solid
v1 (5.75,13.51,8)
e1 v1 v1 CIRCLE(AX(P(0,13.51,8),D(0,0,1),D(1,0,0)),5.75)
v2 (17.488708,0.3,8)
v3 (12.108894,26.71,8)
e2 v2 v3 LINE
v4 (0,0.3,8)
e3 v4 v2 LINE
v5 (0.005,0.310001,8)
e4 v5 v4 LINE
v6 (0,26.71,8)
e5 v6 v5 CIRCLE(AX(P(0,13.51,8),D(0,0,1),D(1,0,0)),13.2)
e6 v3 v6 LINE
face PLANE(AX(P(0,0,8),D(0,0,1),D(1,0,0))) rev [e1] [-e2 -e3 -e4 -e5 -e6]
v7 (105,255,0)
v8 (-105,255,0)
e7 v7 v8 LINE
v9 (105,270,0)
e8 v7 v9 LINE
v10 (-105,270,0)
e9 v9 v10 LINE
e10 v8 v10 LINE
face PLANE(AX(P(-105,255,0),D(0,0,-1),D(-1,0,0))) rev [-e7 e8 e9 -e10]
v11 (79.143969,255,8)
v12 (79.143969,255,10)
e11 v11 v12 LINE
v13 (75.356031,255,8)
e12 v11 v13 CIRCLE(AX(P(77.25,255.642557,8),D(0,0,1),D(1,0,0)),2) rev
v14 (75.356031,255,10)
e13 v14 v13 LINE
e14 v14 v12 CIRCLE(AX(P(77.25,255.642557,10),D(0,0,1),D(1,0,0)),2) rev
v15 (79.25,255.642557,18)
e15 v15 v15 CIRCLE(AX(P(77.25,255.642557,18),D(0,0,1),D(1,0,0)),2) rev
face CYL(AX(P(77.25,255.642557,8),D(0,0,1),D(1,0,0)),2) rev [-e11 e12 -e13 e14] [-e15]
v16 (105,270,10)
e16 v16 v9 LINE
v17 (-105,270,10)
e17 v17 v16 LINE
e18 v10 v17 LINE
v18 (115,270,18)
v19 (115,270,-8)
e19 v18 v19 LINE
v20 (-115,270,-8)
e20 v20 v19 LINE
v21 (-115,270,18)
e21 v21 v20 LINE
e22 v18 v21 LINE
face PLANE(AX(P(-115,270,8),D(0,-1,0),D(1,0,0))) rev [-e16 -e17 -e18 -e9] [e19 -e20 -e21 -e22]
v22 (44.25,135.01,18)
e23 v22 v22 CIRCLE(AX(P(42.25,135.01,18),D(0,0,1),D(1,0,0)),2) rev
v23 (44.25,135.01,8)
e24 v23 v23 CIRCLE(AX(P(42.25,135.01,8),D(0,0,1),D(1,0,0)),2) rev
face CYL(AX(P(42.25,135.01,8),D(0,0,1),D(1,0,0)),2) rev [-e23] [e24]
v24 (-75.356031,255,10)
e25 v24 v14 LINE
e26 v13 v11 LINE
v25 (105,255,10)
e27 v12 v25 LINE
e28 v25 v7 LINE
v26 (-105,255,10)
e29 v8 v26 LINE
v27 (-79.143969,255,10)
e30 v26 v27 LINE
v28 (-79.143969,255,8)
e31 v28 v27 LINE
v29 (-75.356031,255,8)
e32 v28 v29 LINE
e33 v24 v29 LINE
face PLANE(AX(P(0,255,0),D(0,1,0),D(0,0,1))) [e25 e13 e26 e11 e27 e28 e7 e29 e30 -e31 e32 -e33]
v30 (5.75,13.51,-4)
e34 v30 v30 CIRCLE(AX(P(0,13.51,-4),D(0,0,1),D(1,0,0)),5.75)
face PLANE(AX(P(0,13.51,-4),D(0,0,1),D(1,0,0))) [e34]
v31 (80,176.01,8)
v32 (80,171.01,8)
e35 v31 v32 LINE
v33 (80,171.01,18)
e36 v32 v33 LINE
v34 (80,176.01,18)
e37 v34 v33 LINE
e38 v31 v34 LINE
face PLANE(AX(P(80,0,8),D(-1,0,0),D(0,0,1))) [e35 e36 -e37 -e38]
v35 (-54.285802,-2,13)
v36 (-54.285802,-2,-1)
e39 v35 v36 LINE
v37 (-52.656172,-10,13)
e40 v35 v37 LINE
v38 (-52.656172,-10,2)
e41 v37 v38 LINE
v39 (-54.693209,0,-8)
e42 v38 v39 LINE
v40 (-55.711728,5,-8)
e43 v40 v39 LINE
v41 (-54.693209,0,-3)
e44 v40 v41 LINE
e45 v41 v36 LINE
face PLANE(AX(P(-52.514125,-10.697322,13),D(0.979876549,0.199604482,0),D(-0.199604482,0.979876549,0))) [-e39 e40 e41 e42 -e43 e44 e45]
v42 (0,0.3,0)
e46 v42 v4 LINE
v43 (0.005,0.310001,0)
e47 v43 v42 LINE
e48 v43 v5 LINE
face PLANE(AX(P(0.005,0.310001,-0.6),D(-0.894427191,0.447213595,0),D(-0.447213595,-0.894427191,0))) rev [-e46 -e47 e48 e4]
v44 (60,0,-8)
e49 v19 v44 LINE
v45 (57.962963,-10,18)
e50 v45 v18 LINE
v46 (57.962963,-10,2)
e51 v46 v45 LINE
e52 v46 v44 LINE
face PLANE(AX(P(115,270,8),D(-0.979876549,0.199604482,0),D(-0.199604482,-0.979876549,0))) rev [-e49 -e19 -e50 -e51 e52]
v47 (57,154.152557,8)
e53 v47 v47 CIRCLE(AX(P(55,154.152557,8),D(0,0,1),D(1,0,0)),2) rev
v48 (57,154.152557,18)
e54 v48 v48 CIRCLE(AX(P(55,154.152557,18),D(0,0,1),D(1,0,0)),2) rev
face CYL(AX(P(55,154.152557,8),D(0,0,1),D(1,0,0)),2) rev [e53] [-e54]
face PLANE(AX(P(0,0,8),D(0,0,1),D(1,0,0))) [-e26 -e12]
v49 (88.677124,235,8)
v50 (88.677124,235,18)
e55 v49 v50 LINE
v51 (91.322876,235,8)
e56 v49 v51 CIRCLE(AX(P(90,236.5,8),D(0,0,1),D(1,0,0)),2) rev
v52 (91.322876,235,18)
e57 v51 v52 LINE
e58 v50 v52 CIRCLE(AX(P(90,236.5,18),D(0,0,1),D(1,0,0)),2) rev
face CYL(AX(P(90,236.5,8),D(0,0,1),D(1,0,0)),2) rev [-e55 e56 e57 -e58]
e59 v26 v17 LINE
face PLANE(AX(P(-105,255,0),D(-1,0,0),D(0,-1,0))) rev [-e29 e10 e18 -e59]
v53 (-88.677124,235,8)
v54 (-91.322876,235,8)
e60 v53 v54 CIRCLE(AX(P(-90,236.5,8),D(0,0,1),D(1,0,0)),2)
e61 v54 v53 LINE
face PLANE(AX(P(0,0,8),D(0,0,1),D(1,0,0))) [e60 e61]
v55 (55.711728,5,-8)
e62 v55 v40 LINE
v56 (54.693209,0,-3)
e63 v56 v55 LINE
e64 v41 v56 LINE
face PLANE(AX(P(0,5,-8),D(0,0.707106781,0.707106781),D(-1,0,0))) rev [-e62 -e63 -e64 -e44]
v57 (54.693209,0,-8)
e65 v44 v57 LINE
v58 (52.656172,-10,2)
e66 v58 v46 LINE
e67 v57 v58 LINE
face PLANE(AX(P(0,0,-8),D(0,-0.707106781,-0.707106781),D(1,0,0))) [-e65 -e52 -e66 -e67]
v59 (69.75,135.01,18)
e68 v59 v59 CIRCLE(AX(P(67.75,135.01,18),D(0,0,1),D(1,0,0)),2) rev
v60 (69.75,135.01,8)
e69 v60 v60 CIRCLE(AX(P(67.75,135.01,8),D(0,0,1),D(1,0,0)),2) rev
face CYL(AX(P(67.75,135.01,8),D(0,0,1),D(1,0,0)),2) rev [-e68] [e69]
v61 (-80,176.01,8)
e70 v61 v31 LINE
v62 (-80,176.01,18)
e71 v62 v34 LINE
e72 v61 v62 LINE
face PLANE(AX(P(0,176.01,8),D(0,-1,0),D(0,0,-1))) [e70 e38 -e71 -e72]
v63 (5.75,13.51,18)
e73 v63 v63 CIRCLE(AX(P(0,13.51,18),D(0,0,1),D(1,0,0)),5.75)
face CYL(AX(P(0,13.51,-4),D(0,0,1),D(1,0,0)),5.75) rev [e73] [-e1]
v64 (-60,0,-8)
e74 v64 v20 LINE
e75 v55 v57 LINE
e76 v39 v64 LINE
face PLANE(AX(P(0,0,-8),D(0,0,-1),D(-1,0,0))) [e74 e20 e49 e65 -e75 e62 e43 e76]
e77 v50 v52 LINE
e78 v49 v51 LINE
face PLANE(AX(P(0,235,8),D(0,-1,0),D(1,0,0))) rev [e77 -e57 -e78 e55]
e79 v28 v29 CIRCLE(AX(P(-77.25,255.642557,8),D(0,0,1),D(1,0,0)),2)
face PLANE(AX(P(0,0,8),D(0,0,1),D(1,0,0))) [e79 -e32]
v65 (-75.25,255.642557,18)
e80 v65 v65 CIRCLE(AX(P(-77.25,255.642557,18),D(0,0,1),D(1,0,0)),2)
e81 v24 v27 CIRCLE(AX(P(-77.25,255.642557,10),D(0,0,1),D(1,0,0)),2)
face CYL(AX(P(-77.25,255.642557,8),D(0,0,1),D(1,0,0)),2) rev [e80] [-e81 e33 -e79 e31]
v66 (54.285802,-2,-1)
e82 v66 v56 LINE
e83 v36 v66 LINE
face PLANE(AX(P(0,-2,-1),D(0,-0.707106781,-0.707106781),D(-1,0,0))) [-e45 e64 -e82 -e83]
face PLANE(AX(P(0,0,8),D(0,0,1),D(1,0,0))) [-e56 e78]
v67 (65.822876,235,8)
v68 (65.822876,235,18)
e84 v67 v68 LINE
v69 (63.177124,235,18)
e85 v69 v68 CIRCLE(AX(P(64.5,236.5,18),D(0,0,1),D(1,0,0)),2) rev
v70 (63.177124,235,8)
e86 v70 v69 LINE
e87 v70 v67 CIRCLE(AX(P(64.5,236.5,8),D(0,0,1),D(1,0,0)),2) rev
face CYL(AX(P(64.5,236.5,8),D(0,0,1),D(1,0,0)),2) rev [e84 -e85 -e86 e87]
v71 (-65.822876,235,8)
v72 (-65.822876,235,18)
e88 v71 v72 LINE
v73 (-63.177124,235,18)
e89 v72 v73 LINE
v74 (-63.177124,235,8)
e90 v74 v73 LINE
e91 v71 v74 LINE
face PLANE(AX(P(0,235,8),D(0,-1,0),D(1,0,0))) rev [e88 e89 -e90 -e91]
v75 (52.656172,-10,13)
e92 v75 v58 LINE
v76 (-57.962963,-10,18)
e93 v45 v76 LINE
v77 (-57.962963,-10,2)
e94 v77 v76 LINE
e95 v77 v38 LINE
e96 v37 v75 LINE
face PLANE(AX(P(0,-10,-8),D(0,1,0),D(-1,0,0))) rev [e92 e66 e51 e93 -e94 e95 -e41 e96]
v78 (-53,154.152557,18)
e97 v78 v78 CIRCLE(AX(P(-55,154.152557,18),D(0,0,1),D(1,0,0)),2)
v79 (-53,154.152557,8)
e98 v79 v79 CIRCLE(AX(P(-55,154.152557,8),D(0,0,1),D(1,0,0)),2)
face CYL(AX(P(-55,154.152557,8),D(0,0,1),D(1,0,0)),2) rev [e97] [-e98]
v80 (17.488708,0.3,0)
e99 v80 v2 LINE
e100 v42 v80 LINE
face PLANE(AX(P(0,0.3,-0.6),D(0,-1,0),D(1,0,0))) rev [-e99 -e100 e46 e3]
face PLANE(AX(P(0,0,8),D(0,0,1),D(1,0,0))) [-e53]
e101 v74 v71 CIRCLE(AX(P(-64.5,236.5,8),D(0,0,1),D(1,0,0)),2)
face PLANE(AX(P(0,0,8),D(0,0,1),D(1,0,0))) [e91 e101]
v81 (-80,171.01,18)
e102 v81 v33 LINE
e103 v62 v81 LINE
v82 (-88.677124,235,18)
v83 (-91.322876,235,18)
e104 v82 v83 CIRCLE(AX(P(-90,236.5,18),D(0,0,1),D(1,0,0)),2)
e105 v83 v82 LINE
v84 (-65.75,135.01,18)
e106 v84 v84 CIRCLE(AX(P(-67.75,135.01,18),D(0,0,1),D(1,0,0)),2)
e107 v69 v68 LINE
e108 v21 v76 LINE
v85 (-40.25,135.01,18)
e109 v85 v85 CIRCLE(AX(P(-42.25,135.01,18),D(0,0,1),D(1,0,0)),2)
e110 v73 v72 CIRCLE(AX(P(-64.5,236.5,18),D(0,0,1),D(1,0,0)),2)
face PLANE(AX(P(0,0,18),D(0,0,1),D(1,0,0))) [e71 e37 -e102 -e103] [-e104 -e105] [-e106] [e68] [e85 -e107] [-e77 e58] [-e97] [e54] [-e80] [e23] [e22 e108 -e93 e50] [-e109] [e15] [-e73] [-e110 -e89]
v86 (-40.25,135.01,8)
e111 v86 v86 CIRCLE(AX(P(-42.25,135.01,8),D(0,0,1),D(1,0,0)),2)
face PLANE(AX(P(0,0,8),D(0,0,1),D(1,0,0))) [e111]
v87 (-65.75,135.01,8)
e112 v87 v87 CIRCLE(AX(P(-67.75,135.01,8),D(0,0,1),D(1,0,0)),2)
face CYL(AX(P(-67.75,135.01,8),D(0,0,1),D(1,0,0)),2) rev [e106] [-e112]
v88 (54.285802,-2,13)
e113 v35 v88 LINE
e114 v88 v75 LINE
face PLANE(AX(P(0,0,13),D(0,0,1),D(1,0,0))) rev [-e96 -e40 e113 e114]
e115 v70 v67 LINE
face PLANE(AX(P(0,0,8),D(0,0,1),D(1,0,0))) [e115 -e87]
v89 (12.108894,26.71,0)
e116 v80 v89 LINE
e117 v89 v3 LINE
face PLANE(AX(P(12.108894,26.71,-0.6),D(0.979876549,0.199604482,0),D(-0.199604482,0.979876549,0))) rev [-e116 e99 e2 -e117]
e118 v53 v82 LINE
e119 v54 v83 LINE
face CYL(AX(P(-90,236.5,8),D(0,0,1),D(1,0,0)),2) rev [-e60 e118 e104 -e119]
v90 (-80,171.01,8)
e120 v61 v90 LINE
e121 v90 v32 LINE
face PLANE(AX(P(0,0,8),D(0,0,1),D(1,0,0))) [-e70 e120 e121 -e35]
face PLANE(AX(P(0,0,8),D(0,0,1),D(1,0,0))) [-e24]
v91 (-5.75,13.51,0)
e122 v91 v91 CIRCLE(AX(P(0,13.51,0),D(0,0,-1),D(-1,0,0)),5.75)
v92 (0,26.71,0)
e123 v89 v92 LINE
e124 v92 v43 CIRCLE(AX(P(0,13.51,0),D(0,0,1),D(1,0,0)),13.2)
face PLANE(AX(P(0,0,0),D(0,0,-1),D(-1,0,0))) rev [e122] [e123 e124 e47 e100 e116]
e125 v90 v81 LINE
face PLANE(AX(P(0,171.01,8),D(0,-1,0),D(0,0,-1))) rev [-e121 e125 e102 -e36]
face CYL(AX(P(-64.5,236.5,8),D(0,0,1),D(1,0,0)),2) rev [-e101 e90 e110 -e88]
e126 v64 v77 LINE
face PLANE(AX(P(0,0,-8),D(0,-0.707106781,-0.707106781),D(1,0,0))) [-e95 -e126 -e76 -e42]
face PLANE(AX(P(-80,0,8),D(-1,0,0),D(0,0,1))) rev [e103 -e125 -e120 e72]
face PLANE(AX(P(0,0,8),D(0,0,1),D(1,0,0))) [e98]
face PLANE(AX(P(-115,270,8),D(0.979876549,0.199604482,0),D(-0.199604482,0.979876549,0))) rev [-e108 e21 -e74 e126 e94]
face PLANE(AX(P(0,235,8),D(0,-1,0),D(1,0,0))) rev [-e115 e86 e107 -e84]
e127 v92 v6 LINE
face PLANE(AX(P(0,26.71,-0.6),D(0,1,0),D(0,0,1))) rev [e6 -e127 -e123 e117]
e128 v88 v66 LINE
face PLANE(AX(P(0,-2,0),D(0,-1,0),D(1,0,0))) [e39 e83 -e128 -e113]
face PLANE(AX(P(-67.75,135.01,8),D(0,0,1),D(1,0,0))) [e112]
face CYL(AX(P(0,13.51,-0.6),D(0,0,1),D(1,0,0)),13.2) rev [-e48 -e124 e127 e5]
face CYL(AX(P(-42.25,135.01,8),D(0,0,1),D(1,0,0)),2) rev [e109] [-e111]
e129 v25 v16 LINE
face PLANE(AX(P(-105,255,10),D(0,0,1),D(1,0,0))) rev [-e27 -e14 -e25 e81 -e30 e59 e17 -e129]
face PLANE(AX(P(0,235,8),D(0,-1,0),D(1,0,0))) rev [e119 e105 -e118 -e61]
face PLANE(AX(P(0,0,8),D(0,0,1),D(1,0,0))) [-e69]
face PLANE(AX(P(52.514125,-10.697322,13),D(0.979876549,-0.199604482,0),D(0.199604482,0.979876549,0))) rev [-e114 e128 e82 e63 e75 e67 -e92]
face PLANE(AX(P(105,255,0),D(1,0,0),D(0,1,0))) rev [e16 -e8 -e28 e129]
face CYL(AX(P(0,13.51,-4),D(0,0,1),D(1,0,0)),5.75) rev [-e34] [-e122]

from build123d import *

# Parameters (mm, degrees)
EXTRUDE_1_DEPTH     = 8
CUT_EXTRUDE_1_DEPTH = 8.6
EXTRUDE_2_DEPTH     = 8
EXTRUDE_3_DEPTH     = 10
SKETCH_7_R          = 5.75
CUT_EXTRUDE_2_DEPTH = 22
EXTRUDE_5_DEPTH     = 26
CUT_EXTRUDE_4_DEPTH = 21
CHAMFER_6_SIZE      = 5
CHAMFER_8_SIZE      = 10
SKETCH_13_W         = 210
SKETCH_13_H         = 10
CUT_EXTRUDE_5_DEPTH = 15
SKETCH_14_W         = 160
SKETCH_14_H         = 5
CUT_EXTRUDE_6_DEPTH = 10
SKETCH_16_R         = 2
CUT_EXTRUDE_7_DEPTH = 10
SKETCH_18_W         = 109.386418102
SKETCH_18_H         = 16
EXTRUDE_7_DEPTH     = 2
CHAMFER_10_SIZE     = 2


with BuildPart() as part:
    # 草图1 → 凸台-拉伸1 (new body)
    with BuildSketch(Plane.XY):
        Polygon((-60, 0), (60, 0), (115, 270), (-115, 270), align=None)
    extrude(amount=EXTRUDE_1_DEPTH)

    # 草图2 → 切除-拉伸1 (cut)
    with BuildSketch(Plane.XY.offset(8)):
        with BuildLine():
            Line((0.005000474, 0.310000947), (0, 0.3))
            Line((0, 0.3), (17.48870838, 0.3))
            Line((17.48870838, 0.3), (12.108893566, 26.71))
            Line((12.108893566, 26.71), (0, 26.71))
            ThreePointArc((0, 26.71), (-13.199999763, 13.507499763), (0.005000474, 0.310000947))
        make_face()
    extrude(amount=-CUT_EXTRUDE_1_DEPTH, mode=Mode.SUBTRACT)

    # 草图5 → 凸台-拉伸2 (add)
    with BuildSketch(Plane(origin=(0, 0, 0), x_dir=(-1, 0, 0), z_dir=(0, 0, -1))):
        Polygon((60, 0), (115, 270), (-115, 270), (-60, 0), align=None)
    extrude(amount=EXTRUDE_2_DEPTH)

    # 草图6 → 凸台-拉伸3 (add)
    with BuildSketch(Plane.XY.offset(8)):
        Polygon((-115, 270), (-60, 0), (60, 0), (115, 270), align=None)
    extrude(amount=EXTRUDE_3_DEPTH)

    # 草图7 → 切除-拉伸2 (cut)
    with BuildSketch(Plane.XY.offset(18)):
        with Locations((0, 13.51)):
            Circle(SKETCH_7_R)
    extrude(amount=-CUT_EXTRUDE_2_DEPTH, mode=Mode.SUBTRACT)

    # 草图9 → 凸台-拉伸5 (add)
    with BuildSketch(Plane.XY.offset(18)):
        Polygon((-57.962962963, -10), (-60, 0), (60, 0), (57.962962963, -10), align=None)
    extrude(amount=-EXTRUDE_5_DEPTH)

    # 草图12 → 切除-拉伸4 (cut)
    with BuildSketch(Plane.XY.offset(-8)):
        Polygon((54.693209051, 0), (-54.693209051, 0), (-52.656172014, -10), (52.656172014, -10), align=None)
    extrude(amount=CUT_EXTRUDE_4_DEPTH, mode=Mode.SUBTRACT)

    # 倒角6
    chamfer_6_edges = [part.edges().sort_by_distance(p)[0] for p in [
        (0, 0, -8),
    ]]
    chamfer(chamfer_6_edges, length=CHAMFER_6_SIZE)

    # 倒角8
    chamfer_8_edges = [part.edges().sort_by_distance(p)[0] for p in [
        (55.309567488, -10, -8),
        (-55.309567488, -10, -8),
    ]]
    chamfer(chamfer_8_edges, length=CHAMFER_8_SIZE)

    # 草图13 → 切除-拉伸5 (cut)
    with BuildSketch(Plane(origin=(0, 270, 0), x_dir=(1, 0, 0), z_dir=(0, 1, 0))):
        with Locations((0, -5)):
            Rectangle(SKETCH_13_W, SKETCH_13_H)
    extrude(amount=-CUT_EXTRUDE_5_DEPTH, mode=Mode.SUBTRACT)

    # 草图14 → 切除-拉伸6 (cut)
    with BuildSketch(Plane.XY.offset(18)):
        with Locations((0, 173.51)):
            Rectangle(SKETCH_14_W, SKETCH_14_H)
    extrude(amount=-CUT_EXTRUDE_6_DEPTH, mode=Mode.SUBTRACT)

    # 草图16 → 切除-拉伸7 (cut)
    with BuildSketch(Plane.XY.offset(18)):
        with BuildLine():
            ThreePointArc((-88.677124344, 235), (-90, 238.5), (-91.322875656, 235))
            Line((-91.322875656, 235), (-88.677124344, 235))
        make_face()
        with BuildLine():
            ThreePointArc((91.322875656, 235), (90, 238.5), (88.677124344, 235))
            Line((88.677124344, 235), (91.322875656, 235))
        make_face()
        with BuildLine():
            ThreePointArc((65.822875656, 235), (64.5, 238.5), (63.177124344, 235))
            Line((63.177124344, 235), (65.822875656, 235))
        make_face()
        with BuildLine():
            ThreePointArc((-63.177124344, 235), (-64.5, 238.5), (-65.822875656, 235))
            Line((-65.822875656, 235), (-63.177124344, 235))
        make_face()
        with Locations((-77.25, 255.6425573)):
            Circle(SKETCH_16_R)
        with Locations((77.25, 255.6425573)):
            Circle(SKETCH_16_R)
        with Locations((-55, 154.1525573)):
            Circle(SKETCH_16_R)
        with Locations((-67.75, 135.01)):
            Circle(SKETCH_16_R)
        with Locations((-42.25, 135.01)):
            Circle(SKETCH_16_R)
        with Locations((42.25, 135.01)):
            Circle(SKETCH_16_R)
        with Locations((67.75, 135.01)):
            Circle(SKETCH_16_R)
        with Locations((55, 154.1525573)):
            Circle(SKETCH_16_R)
    extrude(amount=-CUT_EXTRUDE_7_DEPTH, mode=Mode.SUBTRACT)

    # 草图18 → 凸台-拉伸7 (add)
    with BuildSketch(Plane.XZ):
        with Locations((0, 5)):
            Rectangle(SKETCH_18_W, SKETCH_18_H)
    extrude(amount=EXTRUDE_7_DEPTH)

    # 倒角10
    chamfer_10_edges = [part.edges().sort_by_distance(p)[0] for p in [
        (0, -2, -3),
    ]]
    chamfer(chamfer_10_edges, length=CHAMFER_10_SIZE - 0.0001)  # a hair under: the kernel refuses the full size


solid = part.part
